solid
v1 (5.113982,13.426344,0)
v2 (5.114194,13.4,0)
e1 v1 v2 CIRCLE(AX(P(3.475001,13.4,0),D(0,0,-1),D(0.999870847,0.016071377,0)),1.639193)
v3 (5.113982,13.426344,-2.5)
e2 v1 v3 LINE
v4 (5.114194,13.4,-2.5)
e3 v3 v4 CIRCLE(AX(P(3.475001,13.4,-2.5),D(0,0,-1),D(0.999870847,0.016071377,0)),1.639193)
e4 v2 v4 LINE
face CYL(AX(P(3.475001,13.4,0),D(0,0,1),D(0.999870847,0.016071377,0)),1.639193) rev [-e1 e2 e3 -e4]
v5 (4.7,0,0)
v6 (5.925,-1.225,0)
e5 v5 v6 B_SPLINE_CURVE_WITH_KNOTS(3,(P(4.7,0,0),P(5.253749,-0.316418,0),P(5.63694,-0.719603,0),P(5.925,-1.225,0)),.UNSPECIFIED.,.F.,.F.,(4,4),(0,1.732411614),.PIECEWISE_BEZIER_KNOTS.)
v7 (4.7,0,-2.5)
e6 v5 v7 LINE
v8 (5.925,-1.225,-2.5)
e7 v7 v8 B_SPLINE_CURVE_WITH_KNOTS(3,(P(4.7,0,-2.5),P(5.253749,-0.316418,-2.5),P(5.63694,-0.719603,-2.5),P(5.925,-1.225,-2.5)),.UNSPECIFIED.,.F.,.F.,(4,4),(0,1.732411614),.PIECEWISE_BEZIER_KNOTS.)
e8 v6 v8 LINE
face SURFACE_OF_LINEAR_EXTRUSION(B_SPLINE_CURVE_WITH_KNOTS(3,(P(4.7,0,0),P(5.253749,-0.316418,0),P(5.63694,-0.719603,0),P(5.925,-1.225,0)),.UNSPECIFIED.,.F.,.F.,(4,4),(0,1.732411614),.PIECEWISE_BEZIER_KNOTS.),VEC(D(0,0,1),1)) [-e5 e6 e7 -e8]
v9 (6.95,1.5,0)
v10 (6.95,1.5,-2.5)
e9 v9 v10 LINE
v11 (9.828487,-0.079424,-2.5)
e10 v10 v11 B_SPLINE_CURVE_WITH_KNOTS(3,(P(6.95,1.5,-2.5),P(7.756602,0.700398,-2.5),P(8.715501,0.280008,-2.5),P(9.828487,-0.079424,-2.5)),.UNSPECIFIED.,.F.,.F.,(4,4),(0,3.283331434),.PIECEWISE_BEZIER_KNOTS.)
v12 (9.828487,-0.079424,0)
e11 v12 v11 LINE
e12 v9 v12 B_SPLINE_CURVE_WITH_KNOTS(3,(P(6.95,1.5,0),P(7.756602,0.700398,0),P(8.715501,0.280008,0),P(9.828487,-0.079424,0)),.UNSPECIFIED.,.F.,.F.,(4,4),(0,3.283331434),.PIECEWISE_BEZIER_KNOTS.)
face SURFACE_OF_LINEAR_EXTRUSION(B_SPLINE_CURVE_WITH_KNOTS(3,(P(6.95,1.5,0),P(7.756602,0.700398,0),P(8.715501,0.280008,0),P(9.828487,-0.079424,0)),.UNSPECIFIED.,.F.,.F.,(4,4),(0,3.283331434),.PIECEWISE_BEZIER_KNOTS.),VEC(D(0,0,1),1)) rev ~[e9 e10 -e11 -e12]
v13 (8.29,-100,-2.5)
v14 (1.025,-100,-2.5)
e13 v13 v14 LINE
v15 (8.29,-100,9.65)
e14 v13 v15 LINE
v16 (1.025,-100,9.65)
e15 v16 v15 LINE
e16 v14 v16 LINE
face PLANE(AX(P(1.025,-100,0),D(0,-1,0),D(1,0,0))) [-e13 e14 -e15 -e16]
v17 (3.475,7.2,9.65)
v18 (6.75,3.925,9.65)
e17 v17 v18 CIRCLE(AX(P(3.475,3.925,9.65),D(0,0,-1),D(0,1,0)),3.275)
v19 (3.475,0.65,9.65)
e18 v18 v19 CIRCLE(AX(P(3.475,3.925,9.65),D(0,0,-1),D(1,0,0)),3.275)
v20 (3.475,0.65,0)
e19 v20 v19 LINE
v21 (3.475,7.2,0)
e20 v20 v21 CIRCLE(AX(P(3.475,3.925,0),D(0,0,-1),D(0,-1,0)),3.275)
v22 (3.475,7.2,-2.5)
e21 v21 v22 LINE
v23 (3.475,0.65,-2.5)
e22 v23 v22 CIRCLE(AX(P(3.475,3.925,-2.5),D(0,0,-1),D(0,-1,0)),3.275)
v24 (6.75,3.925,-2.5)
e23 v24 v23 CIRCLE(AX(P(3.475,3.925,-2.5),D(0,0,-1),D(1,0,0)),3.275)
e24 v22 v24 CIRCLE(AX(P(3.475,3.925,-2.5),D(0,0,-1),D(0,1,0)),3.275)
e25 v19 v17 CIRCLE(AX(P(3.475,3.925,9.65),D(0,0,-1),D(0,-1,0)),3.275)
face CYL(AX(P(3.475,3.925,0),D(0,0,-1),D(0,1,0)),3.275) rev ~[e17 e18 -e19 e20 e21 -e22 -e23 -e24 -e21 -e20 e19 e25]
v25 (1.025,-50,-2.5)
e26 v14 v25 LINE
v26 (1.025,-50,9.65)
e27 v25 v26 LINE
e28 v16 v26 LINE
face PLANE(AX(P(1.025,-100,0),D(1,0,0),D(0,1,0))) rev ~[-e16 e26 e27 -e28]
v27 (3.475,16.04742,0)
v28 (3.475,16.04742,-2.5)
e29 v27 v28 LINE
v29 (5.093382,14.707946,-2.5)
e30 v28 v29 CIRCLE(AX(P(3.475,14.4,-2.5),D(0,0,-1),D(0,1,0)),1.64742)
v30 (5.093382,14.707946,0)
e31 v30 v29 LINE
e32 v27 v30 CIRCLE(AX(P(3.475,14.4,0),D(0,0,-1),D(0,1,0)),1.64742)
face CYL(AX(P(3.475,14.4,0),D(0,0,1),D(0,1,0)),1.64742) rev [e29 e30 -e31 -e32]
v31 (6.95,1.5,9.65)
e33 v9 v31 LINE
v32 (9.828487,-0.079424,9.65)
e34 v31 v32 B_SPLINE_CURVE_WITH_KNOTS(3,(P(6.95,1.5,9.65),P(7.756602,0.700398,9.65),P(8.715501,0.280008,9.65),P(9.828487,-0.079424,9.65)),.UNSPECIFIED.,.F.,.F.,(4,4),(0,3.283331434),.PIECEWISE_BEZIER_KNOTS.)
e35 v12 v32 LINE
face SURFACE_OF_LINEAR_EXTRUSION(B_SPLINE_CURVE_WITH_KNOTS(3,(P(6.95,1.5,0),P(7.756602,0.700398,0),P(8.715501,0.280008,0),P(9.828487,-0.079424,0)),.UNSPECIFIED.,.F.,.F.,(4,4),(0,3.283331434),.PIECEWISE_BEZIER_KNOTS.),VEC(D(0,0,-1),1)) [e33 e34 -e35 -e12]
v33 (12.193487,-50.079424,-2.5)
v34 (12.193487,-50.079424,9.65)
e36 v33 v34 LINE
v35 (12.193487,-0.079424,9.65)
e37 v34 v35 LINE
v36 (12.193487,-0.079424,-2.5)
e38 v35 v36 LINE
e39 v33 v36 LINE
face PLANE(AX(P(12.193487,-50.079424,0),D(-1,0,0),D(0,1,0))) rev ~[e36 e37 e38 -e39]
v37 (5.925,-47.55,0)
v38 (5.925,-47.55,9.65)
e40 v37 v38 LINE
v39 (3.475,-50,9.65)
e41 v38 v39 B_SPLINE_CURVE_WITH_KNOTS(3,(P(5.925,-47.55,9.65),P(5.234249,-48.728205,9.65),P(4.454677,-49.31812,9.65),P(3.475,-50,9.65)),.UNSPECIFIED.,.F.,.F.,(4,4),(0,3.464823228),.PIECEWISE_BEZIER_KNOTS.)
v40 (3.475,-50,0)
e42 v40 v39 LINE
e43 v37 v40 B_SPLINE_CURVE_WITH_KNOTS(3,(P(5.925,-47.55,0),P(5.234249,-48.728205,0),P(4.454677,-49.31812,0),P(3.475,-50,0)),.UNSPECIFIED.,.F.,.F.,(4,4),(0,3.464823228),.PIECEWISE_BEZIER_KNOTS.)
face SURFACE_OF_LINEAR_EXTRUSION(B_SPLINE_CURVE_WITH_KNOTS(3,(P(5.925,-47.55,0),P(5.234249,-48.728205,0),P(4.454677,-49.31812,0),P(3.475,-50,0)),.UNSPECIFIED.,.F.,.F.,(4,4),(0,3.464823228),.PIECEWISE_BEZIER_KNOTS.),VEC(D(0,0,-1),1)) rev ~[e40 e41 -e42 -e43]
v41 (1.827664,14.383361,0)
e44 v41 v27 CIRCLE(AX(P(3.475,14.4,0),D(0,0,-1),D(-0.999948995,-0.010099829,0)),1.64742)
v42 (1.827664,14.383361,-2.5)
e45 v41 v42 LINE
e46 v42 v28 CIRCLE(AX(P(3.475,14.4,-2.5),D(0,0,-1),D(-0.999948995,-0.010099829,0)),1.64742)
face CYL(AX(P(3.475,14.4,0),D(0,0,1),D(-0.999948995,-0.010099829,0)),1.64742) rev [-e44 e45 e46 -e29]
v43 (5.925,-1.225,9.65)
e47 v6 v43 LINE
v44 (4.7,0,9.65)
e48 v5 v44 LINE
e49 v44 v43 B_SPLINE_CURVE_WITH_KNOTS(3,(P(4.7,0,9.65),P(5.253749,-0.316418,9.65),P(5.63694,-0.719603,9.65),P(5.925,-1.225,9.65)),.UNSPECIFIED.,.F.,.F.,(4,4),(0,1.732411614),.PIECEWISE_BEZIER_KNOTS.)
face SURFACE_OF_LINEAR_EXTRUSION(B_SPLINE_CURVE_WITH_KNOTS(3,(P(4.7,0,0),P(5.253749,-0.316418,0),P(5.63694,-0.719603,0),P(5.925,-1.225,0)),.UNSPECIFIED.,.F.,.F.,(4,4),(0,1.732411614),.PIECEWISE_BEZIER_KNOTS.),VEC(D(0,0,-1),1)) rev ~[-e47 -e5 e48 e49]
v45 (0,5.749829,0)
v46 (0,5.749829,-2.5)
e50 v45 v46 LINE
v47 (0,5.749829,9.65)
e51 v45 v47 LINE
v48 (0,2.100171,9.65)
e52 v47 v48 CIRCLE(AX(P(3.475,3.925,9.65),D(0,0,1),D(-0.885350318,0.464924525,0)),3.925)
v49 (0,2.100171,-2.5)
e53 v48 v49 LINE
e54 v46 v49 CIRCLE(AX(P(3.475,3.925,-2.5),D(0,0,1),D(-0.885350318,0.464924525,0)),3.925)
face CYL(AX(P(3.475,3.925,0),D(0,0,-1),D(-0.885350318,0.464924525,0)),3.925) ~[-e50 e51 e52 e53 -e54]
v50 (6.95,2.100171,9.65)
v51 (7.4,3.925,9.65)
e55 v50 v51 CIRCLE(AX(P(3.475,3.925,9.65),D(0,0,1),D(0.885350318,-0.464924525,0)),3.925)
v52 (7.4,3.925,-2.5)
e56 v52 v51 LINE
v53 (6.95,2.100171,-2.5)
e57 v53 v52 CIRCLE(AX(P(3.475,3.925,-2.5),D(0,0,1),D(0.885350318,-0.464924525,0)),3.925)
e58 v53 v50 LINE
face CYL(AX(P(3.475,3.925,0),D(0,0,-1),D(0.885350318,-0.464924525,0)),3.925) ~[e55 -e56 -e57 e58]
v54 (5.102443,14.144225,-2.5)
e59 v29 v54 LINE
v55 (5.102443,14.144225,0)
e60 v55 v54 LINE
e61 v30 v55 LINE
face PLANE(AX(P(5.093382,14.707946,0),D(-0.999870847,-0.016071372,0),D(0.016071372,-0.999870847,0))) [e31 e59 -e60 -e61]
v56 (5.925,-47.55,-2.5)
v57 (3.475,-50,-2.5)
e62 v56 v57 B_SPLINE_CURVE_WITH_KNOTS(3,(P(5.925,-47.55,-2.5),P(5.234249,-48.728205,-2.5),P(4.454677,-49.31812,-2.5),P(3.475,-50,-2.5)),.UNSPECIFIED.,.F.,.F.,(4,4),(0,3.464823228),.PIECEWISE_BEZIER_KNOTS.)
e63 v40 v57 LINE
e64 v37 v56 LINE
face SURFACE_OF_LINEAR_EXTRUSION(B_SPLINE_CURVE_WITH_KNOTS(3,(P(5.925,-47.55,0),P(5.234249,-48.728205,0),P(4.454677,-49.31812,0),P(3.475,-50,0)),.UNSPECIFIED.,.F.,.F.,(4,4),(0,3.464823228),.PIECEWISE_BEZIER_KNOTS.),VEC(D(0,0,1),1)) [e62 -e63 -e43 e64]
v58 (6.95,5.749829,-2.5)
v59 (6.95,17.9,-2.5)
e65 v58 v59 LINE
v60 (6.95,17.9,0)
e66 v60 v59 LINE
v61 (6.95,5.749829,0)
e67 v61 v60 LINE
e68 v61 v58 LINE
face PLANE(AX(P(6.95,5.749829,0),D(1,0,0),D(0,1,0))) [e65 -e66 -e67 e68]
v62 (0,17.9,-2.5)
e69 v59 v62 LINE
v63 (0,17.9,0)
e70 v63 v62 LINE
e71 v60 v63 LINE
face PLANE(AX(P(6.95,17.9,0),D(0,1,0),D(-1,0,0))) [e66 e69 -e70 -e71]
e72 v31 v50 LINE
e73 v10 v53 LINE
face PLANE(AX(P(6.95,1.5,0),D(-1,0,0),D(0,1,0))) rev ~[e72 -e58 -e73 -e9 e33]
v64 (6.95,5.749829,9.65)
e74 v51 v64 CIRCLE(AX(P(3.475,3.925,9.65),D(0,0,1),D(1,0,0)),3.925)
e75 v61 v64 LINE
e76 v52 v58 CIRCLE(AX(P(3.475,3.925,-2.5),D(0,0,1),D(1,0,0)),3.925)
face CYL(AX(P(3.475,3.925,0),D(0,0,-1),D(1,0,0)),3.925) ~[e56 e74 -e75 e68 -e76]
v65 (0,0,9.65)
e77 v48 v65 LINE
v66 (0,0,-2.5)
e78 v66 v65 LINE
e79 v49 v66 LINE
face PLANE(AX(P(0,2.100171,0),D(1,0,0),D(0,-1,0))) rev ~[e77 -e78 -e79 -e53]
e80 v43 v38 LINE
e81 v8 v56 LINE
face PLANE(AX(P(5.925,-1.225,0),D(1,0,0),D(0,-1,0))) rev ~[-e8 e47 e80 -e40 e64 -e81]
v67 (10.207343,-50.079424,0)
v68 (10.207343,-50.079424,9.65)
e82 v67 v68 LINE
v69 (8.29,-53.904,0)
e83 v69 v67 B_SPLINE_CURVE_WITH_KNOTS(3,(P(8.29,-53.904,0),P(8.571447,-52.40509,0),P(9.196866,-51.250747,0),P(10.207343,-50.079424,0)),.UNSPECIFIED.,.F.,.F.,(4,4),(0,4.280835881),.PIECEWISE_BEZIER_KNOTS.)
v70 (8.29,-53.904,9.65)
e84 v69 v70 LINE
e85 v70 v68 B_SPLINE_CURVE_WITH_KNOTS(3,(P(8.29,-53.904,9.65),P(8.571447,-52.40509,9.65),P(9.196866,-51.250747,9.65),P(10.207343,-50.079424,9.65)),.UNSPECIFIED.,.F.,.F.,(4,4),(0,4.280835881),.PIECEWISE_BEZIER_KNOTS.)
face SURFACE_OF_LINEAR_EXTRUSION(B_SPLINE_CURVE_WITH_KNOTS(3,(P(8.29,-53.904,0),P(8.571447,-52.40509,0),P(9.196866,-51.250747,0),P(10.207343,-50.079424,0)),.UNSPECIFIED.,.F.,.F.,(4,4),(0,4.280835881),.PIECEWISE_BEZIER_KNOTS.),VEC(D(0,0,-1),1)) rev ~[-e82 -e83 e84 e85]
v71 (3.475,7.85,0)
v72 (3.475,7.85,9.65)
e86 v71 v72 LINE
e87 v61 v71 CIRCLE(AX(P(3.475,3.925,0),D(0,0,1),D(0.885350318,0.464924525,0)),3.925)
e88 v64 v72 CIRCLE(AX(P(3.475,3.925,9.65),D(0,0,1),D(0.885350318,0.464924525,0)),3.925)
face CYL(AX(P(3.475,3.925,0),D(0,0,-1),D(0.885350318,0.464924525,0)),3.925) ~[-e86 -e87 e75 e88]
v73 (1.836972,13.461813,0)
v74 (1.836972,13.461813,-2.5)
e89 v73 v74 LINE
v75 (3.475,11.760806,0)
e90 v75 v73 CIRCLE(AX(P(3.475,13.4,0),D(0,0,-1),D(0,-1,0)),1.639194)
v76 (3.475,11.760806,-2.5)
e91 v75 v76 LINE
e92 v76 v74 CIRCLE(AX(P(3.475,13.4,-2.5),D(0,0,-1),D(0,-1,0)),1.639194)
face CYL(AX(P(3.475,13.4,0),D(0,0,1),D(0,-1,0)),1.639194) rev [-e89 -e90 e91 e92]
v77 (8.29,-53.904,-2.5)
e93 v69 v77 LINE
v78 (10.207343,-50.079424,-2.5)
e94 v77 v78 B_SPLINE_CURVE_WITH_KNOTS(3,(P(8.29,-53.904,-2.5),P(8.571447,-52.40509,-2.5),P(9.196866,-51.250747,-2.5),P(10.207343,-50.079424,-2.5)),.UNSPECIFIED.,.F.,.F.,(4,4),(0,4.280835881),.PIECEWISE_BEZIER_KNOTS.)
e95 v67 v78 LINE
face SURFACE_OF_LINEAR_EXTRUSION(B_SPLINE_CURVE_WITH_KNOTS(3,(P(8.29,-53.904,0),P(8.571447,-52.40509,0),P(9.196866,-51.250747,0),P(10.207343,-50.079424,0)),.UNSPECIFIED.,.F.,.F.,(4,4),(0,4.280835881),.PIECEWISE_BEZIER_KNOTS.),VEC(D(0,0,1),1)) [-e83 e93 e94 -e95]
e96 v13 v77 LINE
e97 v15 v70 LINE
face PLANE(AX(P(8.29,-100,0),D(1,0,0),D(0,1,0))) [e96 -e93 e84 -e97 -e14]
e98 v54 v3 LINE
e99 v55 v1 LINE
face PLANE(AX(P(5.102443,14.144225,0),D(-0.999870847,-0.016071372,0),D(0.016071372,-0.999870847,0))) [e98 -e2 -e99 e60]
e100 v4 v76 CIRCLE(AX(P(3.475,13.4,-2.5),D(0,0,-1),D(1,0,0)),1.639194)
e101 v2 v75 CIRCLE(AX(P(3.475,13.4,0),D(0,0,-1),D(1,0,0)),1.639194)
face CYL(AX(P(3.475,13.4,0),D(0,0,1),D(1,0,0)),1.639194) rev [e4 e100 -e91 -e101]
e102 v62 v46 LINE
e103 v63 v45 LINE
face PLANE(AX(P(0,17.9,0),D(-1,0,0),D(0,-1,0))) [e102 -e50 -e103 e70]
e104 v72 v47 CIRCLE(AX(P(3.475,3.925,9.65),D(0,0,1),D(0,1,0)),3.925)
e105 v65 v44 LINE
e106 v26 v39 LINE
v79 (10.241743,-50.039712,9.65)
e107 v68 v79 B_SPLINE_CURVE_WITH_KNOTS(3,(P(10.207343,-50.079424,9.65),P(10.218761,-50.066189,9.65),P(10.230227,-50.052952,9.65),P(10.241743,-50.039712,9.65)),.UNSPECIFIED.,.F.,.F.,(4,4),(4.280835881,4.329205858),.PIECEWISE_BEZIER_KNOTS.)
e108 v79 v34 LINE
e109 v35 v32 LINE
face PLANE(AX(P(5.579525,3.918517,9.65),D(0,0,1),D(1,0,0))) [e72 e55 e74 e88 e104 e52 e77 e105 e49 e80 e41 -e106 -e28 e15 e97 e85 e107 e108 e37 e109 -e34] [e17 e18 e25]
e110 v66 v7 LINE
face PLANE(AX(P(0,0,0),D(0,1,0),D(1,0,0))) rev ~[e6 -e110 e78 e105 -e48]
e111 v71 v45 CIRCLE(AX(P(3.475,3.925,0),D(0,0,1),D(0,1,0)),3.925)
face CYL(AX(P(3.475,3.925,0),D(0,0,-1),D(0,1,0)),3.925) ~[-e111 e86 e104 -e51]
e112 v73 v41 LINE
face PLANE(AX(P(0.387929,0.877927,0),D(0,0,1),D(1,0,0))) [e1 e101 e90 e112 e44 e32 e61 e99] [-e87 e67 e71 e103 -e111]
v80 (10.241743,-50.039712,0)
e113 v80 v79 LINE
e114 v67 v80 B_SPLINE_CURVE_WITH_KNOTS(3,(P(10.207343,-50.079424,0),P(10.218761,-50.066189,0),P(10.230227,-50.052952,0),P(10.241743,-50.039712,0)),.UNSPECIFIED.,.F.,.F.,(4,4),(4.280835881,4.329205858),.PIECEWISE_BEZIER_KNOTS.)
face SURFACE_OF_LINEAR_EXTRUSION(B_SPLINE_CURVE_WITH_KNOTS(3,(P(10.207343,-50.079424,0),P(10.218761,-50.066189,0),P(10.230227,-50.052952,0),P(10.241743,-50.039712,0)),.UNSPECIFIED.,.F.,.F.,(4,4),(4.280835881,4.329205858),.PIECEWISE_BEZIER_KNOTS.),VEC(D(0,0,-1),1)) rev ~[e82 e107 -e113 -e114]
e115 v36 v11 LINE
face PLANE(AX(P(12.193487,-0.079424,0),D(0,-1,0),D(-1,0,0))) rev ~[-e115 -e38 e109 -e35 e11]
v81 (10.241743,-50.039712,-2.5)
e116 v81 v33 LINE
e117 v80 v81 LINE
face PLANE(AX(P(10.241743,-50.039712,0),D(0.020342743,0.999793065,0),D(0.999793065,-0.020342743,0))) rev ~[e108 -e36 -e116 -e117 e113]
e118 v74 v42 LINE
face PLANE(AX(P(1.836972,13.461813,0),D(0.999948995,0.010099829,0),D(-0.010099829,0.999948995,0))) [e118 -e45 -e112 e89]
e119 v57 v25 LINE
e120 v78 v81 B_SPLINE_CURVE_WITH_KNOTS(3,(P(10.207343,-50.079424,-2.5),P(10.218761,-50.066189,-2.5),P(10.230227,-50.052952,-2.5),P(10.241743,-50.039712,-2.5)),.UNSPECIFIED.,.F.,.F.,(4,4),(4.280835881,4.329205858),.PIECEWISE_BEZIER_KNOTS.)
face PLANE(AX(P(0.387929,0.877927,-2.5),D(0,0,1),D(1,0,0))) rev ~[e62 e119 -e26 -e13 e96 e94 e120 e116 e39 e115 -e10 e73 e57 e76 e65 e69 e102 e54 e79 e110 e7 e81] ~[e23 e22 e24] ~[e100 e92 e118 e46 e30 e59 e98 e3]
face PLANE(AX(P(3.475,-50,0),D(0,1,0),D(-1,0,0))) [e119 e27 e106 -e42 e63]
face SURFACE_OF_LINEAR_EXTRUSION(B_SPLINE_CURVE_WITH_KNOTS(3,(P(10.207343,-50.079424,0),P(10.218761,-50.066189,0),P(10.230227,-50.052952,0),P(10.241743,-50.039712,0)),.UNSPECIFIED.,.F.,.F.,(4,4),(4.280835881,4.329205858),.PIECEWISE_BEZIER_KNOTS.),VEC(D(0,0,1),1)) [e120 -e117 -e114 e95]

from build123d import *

# Parameters (mm, degrees)
F0_W     = 2.45
F0_H     = 50
F1_DEPTH = 2.5
F2_DEPTH = 9.65
F3_DEPTH = 2.5
F4_DEPTH = 9.65
F5_DEPTH = 9.65
F6_DEPTH = 2.5


with BuildPart() as f1:
    # F0 (on Top) → F1 (new body)
    with BuildSketch(Plane.XY):
        with BuildLine():
            Line((0, 2.1001712409), (0, 0))
            Line((0, 0), (1.025, 0))
            Line((1.025, 0), (1.025, 0.8585484677))
            ThreePointArc((1.025, 0.8585484677), (0.4481513041, 1.426237912), (0, 2.1001712409))
        make_face()
        with BuildLine():
            Line((1.025, 0.8585484677), (1.025, 0))
            Line((1.025, 0), (3.475, 0))
            ThreePointArc((3.475, 0), (2.1769624937, 0.2208504846), (1.025, 0.8585484677))
        make_face()
        with BuildLine():
            ThreePointArc((0, 5.7498287591), (-0.45, 3.925), (0, 2.1001712409))
            Line((0, 2.1001712409), (0, 5.7498287591))
        make_face()
        with BuildLine():
            Line((0, 5.7498287591), (0, 2.1001712409))
            ThreePointArc((0, 2.1001712409), (0.4481513041, 1.426237912), (1.025, 0.8585484677))
            ThreePointArc((1.025, 0.8585484677), (2.1769624937, 0.2208504846), (3.475, 0))
            Line((3.475, 0), (3.475, 0.65))
            ThreePointArc((3.475, 0.65), (0.2, 3.925), (3.475, 7.2))
            Line((3.475, 7.2), (3.475, 7.85))
            ThreePointArc((3.475, 7.85), (1.4448310267, 7.2841723593), (0, 5.7498287591))
        make_face()
        with BuildLine():
            ThreePointArc((5.925, 0.8585484677), (4.7730375063, 0.2208504846), (3.475, 0))
            Line((3.475, 0), (4.7, 0))
            Line((4.7, 0), (5.925, 0))
            Line((5.925, 0), (5.925, 0.8585484677))
        make_face()
        with BuildLine():
            Line((3.475, 0.65), (3.475, 0))
            ThreePointArc((3.475, 0), (4.7730375063, 0.2208504846), (5.925, 0.8585484677))
            ThreePointArc((5.925, 0.8585484677), (6.5018486959, 1.426237912), (6.95, 2.1001712409))
            Line((6.95, 2.1001712409), (6.95, 5.7498287591))
            ThreePointArc((6.95, 5.7498287591), (5.5051689733, 7.2841723593), (3.475, 7.85))
            Line((3.475, 7.85), (3.475, 7.2))
            ThreePointArc((3.475, 7.2), (5.7907747084, 6.2407747084), (6.75, 3.925))
            ThreePointArc((6.75, 3.925), (5.7907747084, 1.6092252916), (3.475, 0.65))
        make_face()
        with BuildLine():
            Line((0, 7.85), (0, 5.7498287591))
            ThreePointArc((0, 5.7498287591), (1.4448310267, 7.2841723593), (3.475, 7.85))
            ThreePointArc((3.475, 7.85), (5.5051689733, 7.2841723593), (6.95, 5.7498287591))
            Line((6.95, 5.7498287591), (6.95, 17.9))
            Line((6.95, 17.9), (3.475, 17.9))
            Line((3.475, 17.9), (0, 17.9))
            Line((0, 17.9), (0, 7.85))
        make_face()
        with BuildLine():
            ThreePointArc((1.8276640256, 14.3833613398), (2.3042302705, 15.55900427), (3.475, 16.0474200003))
            ThreePointArc((3.475, 16.0474200003), (4.5253988967, 15.6691157612), (5.0933824344, 14.7079463483))
            Line((5.0933824344, 14.7079463483), (5.1024433757, 14.1442252627))
            Line((5.1024433757, 14.1442252627), (5.113982201, 13.4263440945))
            ThreePointArc((5.113982201, 13.4263440945), (5.1141409801, 13.4131724726), (5.1141939076, 13.4))
            ThreePointArc((5.1141939076, 13.4), (4.6340851277, 12.2409148723), (3.475, 11.7608060924))
            ThreePointArc((3.475, 11.7608060924), (2.2942628451, 12.2629791393), (1.8369719791, 13.4618131819))
            Line((1.8369719791, 13.4618131819), (1.8276640256, 14.3833613398))
        make_face(mode=Mode.SUBTRACT)
        with BuildLine():
            Line((5.925, 0), (4.7, 0))
            add(Edge.make_bspline(
                [(4.7, 0), (5.2537494339, -0.3164176305), (5.6369397789, -0.7196032093), (5.925, -1.225)],
                knots=[0, 0, 0, 0, 1.7324116139, 1.7324116139, 1.7324116139, 1.7324116139], degree=3))
            Line((5.925, -1.225), (5.925, -0.079424061))
            Line((5.925, -0.079424061), (5.925, 0))
        make_face()
        with BuildLine():
            ThreePointArc((6.95, 2.1001712409), (6.5018486959, 1.426237912), (5.925, 0.8585484677))
            Line((5.925, 0.8585484677), (5.925, 0))
            Line((5.925, 0), (6.95, 0))
            Line((6.95, 0), (6.95, 1.44))
            Line((6.95, 1.44), (6.95, 1.5))
            Line((6.95, 1.5), (6.95, 2.1001712409))
        make_face()
        Polygon((6.95, 0), (5.925, 0), (5.925, -0.079424061), (5.925, -1.225), (5.925, -21.3844068348), (5.925, -22.55), (5.925, -22.9875), (5.925, -25), (9.8284865708, -25), (9.8284865708, -0.079424061), align=None)
        with BuildLine():
            Line((6.95, 5.7498287591), (6.95, 2.1001712409))
            ThreePointArc((6.95, 2.1001712409), (7.2858398025, 2.9852526935), (7.4, 3.925))
            ThreePointArc((7.4, 3.925), (7.2858398025, 4.8647473065), (6.95, 5.7498287591))
        make_face()
        with BuildLine():
            Line((6.95, 1.44), (6.95, 0))
            Line((6.95, 0), (9.8284865708, -0.079424061))
            add(Edge.make_bspline(
                [(6.95, 1.5), (7.7566024847, 0.7003984647), (8.7155010551, 0.2800084476), (9.8284865708, -0.079424061)],
                knots=[0, 0, 0, 0, 3.2833314336, 3.2833314336, 3.2833314336, 3.2833314336], degree=3))
            Line((6.95, 1.5), (6.95, 1.44))
        make_face()
        Polygon((12.1934865708, -0.079424061), (9.8284865708, -0.079424061), (9.8284865708, -25), (9.8284865708, -50.0313035152), (10.2417432854, -50.0397120305), (12.1934865708, -50.079424061), align=None)
        Polygon((9.8284865708, -25), (5.925, -25), (5.925, -26.9515), (5.925, -28.903), (5.925, -47.55), (5.925, -50), (8.29, -50), (9.8284865708, -50.0313035152), align=None)
        with Locations((2.25, -75)):
            Rectangle(F0_W, F0_H)
        with BuildLine():
            Line((10.2417432854, -50.0397120305), (9.8284865708, -50.0313035152))
            Line((9.8284865708, -50.0313035152), (9.8284865708, -50.0397120305))
            Line((9.8284865708, -50.0397120305), (9.8284865708, -50.079424061))
            Line((9.8284865708, -50.079424061), (10.207343012, -50.079424061))
            add(Edge.make_bspline(
                [(10.207343012, -50.079424061), (10.2187605889, -50.0661890592), (10.230227327, -50.0529518896), (10.2417432854, -50.0397120305)],
                knots=[4.2808358806, 4.2808358806, 4.2808358806, 4.2808358806, 4.3292058583, 4.3292058583, 4.3292058583, 4.3292058583], degree=3))
        make_face()
        Polygon((9.8284865708, -50.0397120305), (9.8284865708, -50.0313035152), (8.29, -50), (8.29, -50.0240602729), align=None)
        Polygon((5.925, -50), (3.475, -50), (3.475, -100), (5.925, -100), (5.925, -52.0125), align=None)
        with BuildLine():
            add(Edge.make_bspline(
                [(5.925, -47.55), (5.2342489362, -48.7282052636), (4.4546769932, -49.3181198835), (3.475, -50)],
                knots=[0, 0, 0, 0, 3.4648232278, 3.4648232278, 3.4648232278, 3.4648232278], degree=3))
            Line((3.475, -50), (5.925, -50))
            Line((5.925, -50), (5.925, -47.55))
        make_face()
        with BuildLine():
            Line((9.8284865708, -50.079424061), (9.8284865708, -50.0397120305))
            Line((9.8284865708, -50.0397120305), (8.29, -50.0240602729))
            Line((8.29, -50.0240602729), (8.29, -53.904))
            add(Edge.make_bspline(
                [(8.29, -53.904), (8.5714472143, -52.4050904341), (9.1968655396, -51.250747129), (10.207343012, -50.079424061)],
                knots=[0, 0, 0, 0, 4.2808358806, 4.2808358806, 4.2808358806, 4.2808358806], degree=3))
            Line((10.207343012, -50.079424061), (9.8284865708, -50.079424061))
        make_face()
        Polygon((8.29, -50.0240602729), (8.29, -50), (5.925, -50), align=None)
        Polygon((8.29, -50.0240602729), (5.925, -50), (5.925, -52.0125), (5.925, -100), (8.29, -100), (8.29, -53.904), align=None)
    extrude(amount=-F1_DEPTH)

    # F0 (on Top) → F2 (join)
    with BuildSketch(Plane.XY):
        with BuildLine():
            Line((3.475, 0.65), (3.475, 0))
            ThreePointArc((3.475, 0), (4.7730375063, 0.2208504846), (5.925, 0.8585484677))
            ThreePointArc((5.925, 0.8585484677), (6.5018486959, 1.426237912), (6.95, 2.1001712409))
            Line((6.95, 2.1001712409), (6.95, 5.7498287591))
            ThreePointArc((6.95, 5.7498287591), (5.5051689733, 7.2841723593), (3.475, 7.85))
            Line((3.475, 7.85), (3.475, 7.2))
            ThreePointArc((3.475, 7.2), (5.7907747084, 6.2407747084), (6.75, 3.925))
            ThreePointArc((6.75, 3.925), (5.7907747084, 1.6092252916), (3.475, 0.65))
        make_face()
        with BuildLine():
            Line((0, 5.7498287591), (0, 2.1001712409))
            ThreePointArc((0, 2.1001712409), (0.4481513041, 1.426237912), (1.025, 0.8585484677))
            ThreePointArc((1.025, 0.8585484677), (2.1769624937, 0.2208504846), (3.475, 0))
            Line((3.475, 0), (3.475, 0.65))
            ThreePointArc((3.475, 0.65), (0.2, 3.925), (3.475, 7.2))
            Line((3.475, 7.2), (3.475, 7.85))
            ThreePointArc((3.475, 7.85), (1.4448310267, 7.2841723593), (0, 5.7498287591))
        make_face()
        with BuildLine():
            Line((6.95, 5.7498287591), (6.95, 2.1001712409))
            ThreePointArc((6.95, 2.1001712409), (7.2858398025, 2.9852526935), (7.4, 3.925))
            ThreePointArc((7.4, 3.925), (7.2858398025, 4.8647473065), (6.95, 5.7498287591))
        make_face()
        with BuildLine():
            ThreePointArc((0, 5.7498287591), (-0.45, 3.925), (0, 2.1001712409))
            Line((0, 2.1001712409), (0, 5.7498287591))
        make_face()
        with BuildLine():
            Line((6.95, 1.44), (6.95, 0))
            Line((6.95, 0), (9.8284865708, -0.079424061))
            add(Edge.make_bspline(
                [(6.95, 1.5), (7.7566024847, 0.7003984647), (8.7155010551, 0.2800084476), (9.8284865708, -0.079424061)],
                knots=[0, 0, 0, 0, 3.2833314336, 3.2833314336, 3.2833314336, 3.2833314336], degree=3))
            Line((6.95, 1.5), (6.95, 1.44))
        make_face()
        with BuildLine():
            ThreePointArc((6.95, 2.1001712409), (6.5018486959, 1.426237912), (5.925, 0.8585484677))
            Line((5.925, 0.8585484677), (5.925, 0))
            Line((5.925, 0), (6.95, 0))
            Line((6.95, 0), (6.95, 1.44))
            Line((6.95, 1.44), (6.95, 1.5))
            Line((6.95, 1.5), (6.95, 2.1001712409))
        make_face()
        with BuildLine():
            ThreePointArc((5.925, 0.8585484677), (4.7730375063, 0.2208504846), (3.475, 0))
            Line((3.475, 0), (4.7, 0))
            Line((4.7, 0), (5.925, 0))
            Line((5.925, 0), (5.925, 0.8585484677))
        make_face()
        with BuildLine():
            Line((1.025, 0.8585484677), (1.025, 0))
            Line((1.025, 0), (3.475, 0))
            ThreePointArc((3.475, 0), (2.1769624937, 0.2208504846), (1.025, 0.8585484677))
        make_face()
        with BuildLine():
            Line((0, 2.1001712409), (0, 0))
            Line((0, 0), (1.025, 0))
            Line((1.025, 0), (1.025, 0.8585484677))
            ThreePointArc((1.025, 0.8585484677), (0.4481513041, 1.426237912), (0, 2.1001712409))
        make_face()
        Polygon((6.95, 0), (5.925, 0), (5.925, -0.079424061), (5.925, -1.225), (5.925, -21.3844068348), (5.925, -22.55), (5.925, -22.9875), (5.925, -25), (9.8284865708, -25), (9.8284865708, -0.079424061), align=None)
        with BuildLine():
            Line((5.925, 0), (4.7, 0))
            add(Edge.make_bspline(
                [(4.7, 0), (5.2537494339, -0.3164176305), (5.6369397789, -0.7196032093), (5.925, -1.225)],
                knots=[0, 0, 0, 0, 1.7324116139, 1.7324116139, 1.7324116139, 1.7324116139], degree=3))
            Line((5.925, -1.225), (5.925, -0.079424061))
            Line((5.925, -0.079424061), (5.925, 0))
        make_face()
        Polygon((9.8284865708, -25), (5.925, -25), (5.925, -26.9515), (5.925, -28.903), (5.925, -47.55), (5.925, -50), (8.29, -50), (9.8284865708, -50.0313035152), align=None)
        with BuildLine():
            add(Edge.make_bspline(
                [(5.925, -47.55), (5.2342489362, -48.7282052636), (4.4546769932, -49.3181198835), (3.475, -50)],
                knots=[0, 0, 0, 0, 3.4648232278, 3.4648232278, 3.4648232278, 3.4648232278], degree=3))
            Line((3.475, -50), (5.925, -50))
            Line((5.925, -50), (5.925, -47.55))
        make_face()
        Polygon((8.29, -50.0240602729), (5.925, -50), (5.925, -52.0125), (5.925, -100), (8.29, -100), (8.29, -53.904), align=None)
        Polygon((5.925, -50), (3.475, -50), (3.475, -100), (5.925, -100), (5.925, -52.0125), align=None)
        with Locations((2.25, -75)):
            Rectangle(F0_W, F0_H)
    extrude(amount=F2_DEPTH)

    # F0 (on Top) → F3 (join)
    with BuildSketch(Plane.XY):
        Polygon((12.1934865708, -0.079424061), (9.8284865708, -0.079424061), (9.8284865708, -25), (9.8284865708, -50.0313035152), (10.2417432854, -50.0397120305), (12.1934865708, -50.079424061), align=None)
        Polygon((8.29, -50.0240602729), (5.925, -50), (5.925, -52.0125), (5.925, -100), (8.29, -100), (8.29, -53.904), align=None)
        with BuildLine():
            Line((9.8284865708, -50.079424061), (9.8284865708, -50.0397120305))
            Line((9.8284865708, -50.0397120305), (8.29, -50.0240602729))
            Line((8.29, -50.0240602729), (8.29, -53.904))
            add(Edge.make_bspline(
                [(8.29, -53.904), (8.5714472143, -52.4050904341), (9.1968655396, -51.250747129), (10.207343012, -50.079424061)],
                knots=[0, 0, 0, 0, 4.2808358806, 4.2808358806, 4.2808358806, 4.2808358806], degree=3))
            Line((10.207343012, -50.079424061), (9.8284865708, -50.079424061))
        make_face()
    extrude(amount=-F3_DEPTH)

    # F0 (on Top) → F4 (join)
    with BuildSketch(Plane.XY):
        with BuildLine():
            Line((0, 2.1001712409), (0, 0))
            Line((0, 0), (1.025, 0))
            Line((1.025, 0), (1.025, 0.8585484677))
            ThreePointArc((1.025, 0.8585484677), (0.4481513041, 1.426237912), (0, 2.1001712409))
        make_face()
        with BuildLine():
            Line((1.025, 0.8585484677), (1.025, 0))
            Line((1.025, 0), (3.475, 0))
            ThreePointArc((3.475, 0), (2.1769624937, 0.2208504846), (1.025, 0.8585484677))
        make_face()
        with BuildLine():
            ThreePointArc((0, 5.7498287591), (-0.45, 3.925), (0, 2.1001712409))
            Line((0, 2.1001712409), (0, 5.7498287591))
        make_face()
        with BuildLine():
            Line((0, 5.7498287591), (0, 2.1001712409))
            ThreePointArc((0, 2.1001712409), (0.4481513041, 1.426237912), (1.025, 0.8585484677))
            ThreePointArc((1.025, 0.8585484677), (2.1769624937, 0.2208504846), (3.475, 0))
            Line((3.475, 0), (3.475, 0.65))
            ThreePointArc((3.475, 0.65), (0.2, 3.925), (3.475, 7.2))
            Line((3.475, 7.2), (3.475, 7.85))
            ThreePointArc((3.475, 7.85), (1.4448310267, 7.2841723593), (0, 5.7498287591))
        make_face()
        with BuildLine():
            ThreePointArc((5.925, 0.8585484677), (4.7730375063, 0.2208504846), (3.475, 0))
            Line((3.475, 0), (4.7, 0))
            Line((4.7, 0), (5.925, 0))
            Line((5.925, 0), (5.925, 0.8585484677))
        make_face()
        with BuildLine():
            Line((3.475, 0.65), (3.475, 0))
            ThreePointArc((3.475, 0), (4.7730375063, 0.2208504846), (5.925, 0.8585484677))
            ThreePointArc((5.925, 0.8585484677), (6.5018486959, 1.426237912), (6.95, 2.1001712409))
            Line((6.95, 2.1001712409), (6.95, 5.7498287591))
            ThreePointArc((6.95, 5.7498287591), (5.5051689733, 7.2841723593), (3.475, 7.85))
            Line((3.475, 7.85), (3.475, 7.2))
            ThreePointArc((3.475, 7.2), (5.7907747084, 6.2407747084), (6.75, 3.925))
            ThreePointArc((6.75, 3.925), (5.7907747084, 1.6092252916), (3.475, 0.65))
        make_face()
        with BuildLine():
            Line((5.925, 0), (4.7, 0))
            add(Edge.make_bspline(
                [(4.7, 0), (5.2537494339, -0.3164176305), (5.6369397789, -0.7196032093), (5.925, -1.225)],
                knots=[0, 0, 0, 0, 1.7324116139, 1.7324116139, 1.7324116139, 1.7324116139], degree=3))
            Line((5.925, -1.225), (5.925, -0.079424061))
            Line((5.925, -0.079424061), (5.925, 0))
        make_face()
        with BuildLine():
            ThreePointArc((6.95, 2.1001712409), (6.5018486959, 1.426237912), (5.925, 0.8585484677))
            Line((5.925, 0.8585484677), (5.925, 0))
            Line((5.925, 0), (6.95, 0))
            Line((6.95, 0), (6.95, 1.44))
            Line((6.95, 1.44), (6.95, 1.5))
            Line((6.95, 1.5), (6.95, 2.1001712409))
        make_face()
        Polygon((6.95, 0), (5.925, 0), (5.925, -0.079424061), (5.925, -1.225), (5.925, -21.3844068348), (5.925, -22.55), (5.925, -22.9875), (5.925, -25), (9.8284865708, -25), (9.8284865708, -0.079424061), align=None)
        with BuildLine():
            Line((6.95, 5.7498287591), (6.95, 2.1001712409))
            ThreePointArc((6.95, 2.1001712409), (7.2858398025, 2.9852526935), (7.4, 3.925))
            ThreePointArc((7.4, 3.925), (7.2858398025, 4.8647473065), (6.95, 5.7498287591))
        make_face()
        with BuildLine():
            Line((6.95, 1.44), (6.95, 0))
            Line((6.95, 0), (9.8284865708, -0.079424061))
            add(Edge.make_bspline(
                [(6.95, 1.5), (7.7566024847, 0.7003984647), (8.7155010551, 0.2800084476), (9.8284865708, -0.079424061)],
                knots=[0, 0, 0, 0, 3.2833314336, 3.2833314336, 3.2833314336, 3.2833314336], degree=3))
            Line((6.95, 1.5), (6.95, 1.44))
        make_face()
        Polygon((12.1934865708, -0.079424061), (9.8284865708, -0.079424061), (9.8284865708, -25), (9.8284865708, -50.0313035152), (10.2417432854, -50.0397120305), (12.1934865708, -50.079424061), align=None)
        with BuildLine():
            Line((9.8284865708, -50.079424061), (9.8284865708, -50.0397120305))
            Line((9.8284865708, -50.0397120305), (8.29, -50.0240602729))
            Line((8.29, -50.0240602729), (8.29, -53.904))
            add(Edge.make_bspline(
                [(8.29, -53.904), (8.5714472143, -52.4050904341), (9.1968655396, -51.250747129), (10.207343012, -50.079424061)],
                knots=[0, 0, 0, 0, 4.2808358806, 4.2808358806, 4.2808358806, 4.2808358806], degree=3))
            Line((10.207343012, -50.079424061), (9.8284865708, -50.079424061))
        make_face()
        Polygon((8.29, -50.0240602729), (5.925, -50), (5.925, -52.0125), (5.925, -100), (8.29, -100), (8.29, -53.904), align=None)
    extrude(amount=F4_DEPTH)

    # F0 (on Top) → F5 (join)
    with BuildSketch(Plane.XY):
        with BuildLine():
            Line((0, 2.1001712409), (0, 0))
            Line((0, 0), (1.025, 0))
            Line((1.025, 0), (1.025, 0.8585484677))
            ThreePointArc((1.025, 0.8585484677), (0.4481513041, 1.426237912), (0, 2.1001712409))
        make_face()
        with BuildLine():
            Line((1.025, 0.8585484677), (1.025, 0))
            Line((1.025, 0), (3.475, 0))
            ThreePointArc((3.475, 0), (2.1769624937, 0.2208504846), (1.025, 0.8585484677))
        make_face()
        with BuildLine():
            ThreePointArc((0, 5.7498287591), (-0.45, 3.925), (0, 2.1001712409))
            Line((0, 2.1001712409), (0, 5.7498287591))
        make_face()
        with BuildLine():
            Line((0, 5.7498287591), (0, 2.1001712409))
            ThreePointArc((0, 2.1001712409), (0.4481513041, 1.426237912), (1.025, 0.8585484677))
            ThreePointArc((1.025, 0.8585484677), (2.1769624937, 0.2208504846), (3.475, 0))
            Line((3.475, 0), (3.475, 0.65))
            ThreePointArc((3.475, 0.65), (0.2, 3.925), (3.475, 7.2))
            Line((3.475, 7.2), (3.475, 7.85))
            ThreePointArc((3.475, 7.85), (1.4448310267, 7.2841723593), (0, 5.7498287591))
        make_face()
        with BuildLine():
            ThreePointArc((5.925, 0.8585484677), (4.7730375063, 0.2208504846), (3.475, 0))
            Line((3.475, 0), (4.7, 0))
            Line((4.7, 0), (5.925, 0))
            Line((5.925, 0), (5.925, 0.8585484677))
        make_face()
        with BuildLine():
            Line((3.475, 0.65), (3.475, 0))
            ThreePointArc((3.475, 0), (4.7730375063, 0.2208504846), (5.925, 0.8585484677))
            ThreePointArc((5.925, 0.8585484677), (6.5018486959, 1.426237912), (6.95, 2.1001712409))
            Line((6.95, 2.1001712409), (6.95, 5.7498287591))
            ThreePointArc((6.95, 5.7498287591), (5.5051689733, 7.2841723593), (3.475, 7.85))
            Line((3.475, 7.85), (3.475, 7.2))
            ThreePointArc((3.475, 7.2), (5.7907747084, 6.2407747084), (6.75, 3.925))
            ThreePointArc((6.75, 3.925), (5.7907747084, 1.6092252916), (3.475, 0.65))
        make_face()
        with BuildLine():
            Line((5.925, 0), (4.7, 0))
            add(Edge.make_bspline(
                [(4.7, 0), (5.2537494339, -0.3164176305), (5.6369397789, -0.7196032093), (5.925, -1.225)],
                knots=[0, 0, 0, 0, 1.7324116139, 1.7324116139, 1.7324116139, 1.7324116139], degree=3))
            Line((5.925, -1.225), (5.925, -0.079424061))
            Line((5.925, -0.079424061), (5.925, 0))
        make_face()
        with BuildLine():
            ThreePointArc((6.95, 2.1001712409), (6.5018486959, 1.426237912), (5.925, 0.8585484677))
            Line((5.925, 0.8585484677), (5.925, 0))
            Line((5.925, 0), (6.95, 0))
            Line((6.95, 0), (6.95, 1.44))
            Line((6.95, 1.44), (6.95, 1.5))
            Line((6.95, 1.5), (6.95, 2.1001712409))
        make_face()
        Polygon((6.95, 0), (5.925, 0), (5.925, -0.079424061), (5.925, -1.225), (5.925, -21.3844068348), (5.925, -22.55), (5.925, -22.9875), (5.925, -25), (9.8284865708, -25), (9.8284865708, -0.079424061), align=None)
        with BuildLine():
            Line((6.95, 5.7498287591), (6.95, 2.1001712409))
            ThreePointArc((6.95, 2.1001712409), (7.2858398025, 2.9852526935), (7.4, 3.925))
            ThreePointArc((7.4, 3.925), (7.2858398025, 4.8647473065), (6.95, 5.7498287591))
        make_face()
        with BuildLine():
            Line((6.95, 1.44), (6.95, 0))
            Line((6.95, 0), (9.8284865708, -0.079424061))
            add(Edge.make_bspline(
                [(6.95, 1.5), (7.7566024847, 0.7003984647), (8.7155010551, 0.2800084476), (9.8284865708, -0.079424061)],
                knots=[0, 0, 0, 0, 3.2833314336, 3.2833314336, 3.2833314336, 3.2833314336], degree=3))
            Line((6.95, 1.5), (6.95, 1.44))
        make_face()
        Polygon((12.1934865708, -0.079424061), (9.8284865708, -0.079424061), (9.8284865708, -25), (9.8284865708, -50.0313035152), (10.2417432854, -50.0397120305), (12.1934865708, -50.079424061), align=None)
        Polygon((9.8284865708, -25), (5.925, -25), (5.925, -26.9515), (5.925, -28.903), (5.925, -47.55), (5.925, -50), (8.29, -50), (9.8284865708, -50.0313035152), align=None)
        with Locations((2.25, -75)):
            Rectangle(F0_W, F0_H)
        with BuildLine():
            Line((10.2417432854, -50.0397120305), (9.8284865708, -50.0313035152))
            Line((9.8284865708, -50.0313035152), (9.8284865708, -50.0397120305))
            Line((9.8284865708, -50.0397120305), (9.8284865708, -50.079424061))
            Line((9.8284865708, -50.079424061), (10.207343012, -50.079424061))
            add(Edge.make_bspline(
                [(10.207343012, -50.079424061), (10.2187605889, -50.0661890592), (10.230227327, -50.0529518896), (10.2417432854, -50.0397120305)],
                knots=[4.2808358806, 4.2808358806, 4.2808358806, 4.2808358806, 4.3292058583, 4.3292058583, 4.3292058583, 4.3292058583], degree=3))
        make_face()
        Polygon((9.8284865708, -50.0397120305), (9.8284865708, -50.0313035152), (8.29, -50), (8.29, -50.0240602729), align=None)
        Polygon((5.925, -50), (3.475, -50), (3.475, -100), (5.925, -100), (5.925, -52.0125), align=None)
        with BuildLine():
            add(Edge.make_bspline(
                [(5.925, -47.55), (5.2342489362, -48.7282052636), (4.4546769932, -49.3181198835), (3.475, -50)],
                knots=[0, 0, 0, 0, 3.4648232278, 3.4648232278, 3.4648232278, 3.4648232278], degree=3))
            Line((3.475, -50), (5.925, -50))
            Line((5.925, -50), (5.925, -47.55))
        make_face()
        Polygon((8.29, -50.0240602729), (8.29, -50), (5.925, -50), align=None)
    extrude(amount=F5_DEPTH)

    # F0 (on Top) → F6 (join)
    with BuildSketch(Plane.XY):
        with BuildLine():
            Line((0, 2.1001712409), (0, 0))
            Line((0, 0), (1.025, 0))
            Line((1.025, 0), (1.025, 0.8585484677))
            ThreePointArc((1.025, 0.8585484677), (0.4481513041, 1.426237912), (0, 2.1001712409))
        make_face()
        with BuildLine():
            Line((1.025, 0.8585484677), (1.025, 0))
            Line((1.025, 0), (3.475, 0))
            ThreePointArc((3.475, 0), (2.1769624937, 0.2208504846), (1.025, 0.8585484677))
        make_face()
        with BuildLine():
            ThreePointArc((0, 5.7498287591), (-0.45, 3.925), (0, 2.1001712409))
            Line((0, 2.1001712409), (0, 5.7498287591))
        make_face()
        with BuildLine():
            Line((0, 5.7498287591), (0, 2.1001712409))
            ThreePointArc((0, 2.1001712409), (0.4481513041, 1.426237912), (1.025, 0.8585484677))
            ThreePointArc((1.025, 0.8585484677), (2.1769624937, 0.2208504846), (3.475, 0))
            Line((3.475, 0), (3.475, 0.65))
            ThreePointArc((3.475, 0.65), (0.2, 3.925), (3.475, 7.2))
            Line((3.475, 7.2), (3.475, 7.85))
            ThreePointArc((3.475, 7.85), (1.4448310267, 7.2841723593), (0, 5.7498287591))
        make_face()
        with BuildLine():
            ThreePointArc((5.925, 0.8585484677), (4.7730375063, 0.2208504846), (3.475, 0))
            Line((3.475, 0), (4.7, 0))
            Line((4.7, 0), (5.925, 0))
            Line((5.925, 0), (5.925, 0.8585484677))
        make_face()
        with BuildLine():
            Line((3.475, 0.65), (3.475, 0))
            ThreePointArc((3.475, 0), (4.7730375063, 0.2208504846), (5.925, 0.8585484677))
            ThreePointArc((5.925, 0.8585484677), (6.5018486959, 1.426237912), (6.95, 2.1001712409))
            Line((6.95, 2.1001712409), (6.95, 5.7498287591))
            ThreePointArc((6.95, 5.7498287591), (5.5051689733, 7.2841723593), (3.475, 7.85))
            Line((3.475, 7.85), (3.475, 7.2))
            ThreePointArc((3.475, 7.2), (5.7907747084, 6.2407747084), (6.75, 3.925))
            ThreePointArc((6.75, 3.925), (5.7907747084, 1.6092252916), (3.475, 0.65))
        make_face()
        with BuildLine():
            Line((0, 7.85), (0, 5.7498287591))
            ThreePointArc((0, 5.7498287591), (1.4448310267, 7.2841723593), (3.475, 7.85))
            ThreePointArc((3.475, 7.85), (5.5051689733, 7.2841723593), (6.95, 5.7498287591))
            Line((6.95, 5.7498287591), (6.95, 17.9))
            Line((6.95, 17.9), (3.475, 17.9))
            Line((3.475, 17.9), (0, 17.9))
            Line((0, 17.9), (0, 7.85))
        make_face()
        with BuildLine():
            ThreePointArc((1.8276640256, 14.3833613398), (2.3042302705, 15.55900427), (3.475, 16.0474200003))
            ThreePointArc((3.475, 16.0474200003), (4.5253988967, 15.6691157612), (5.0933824344, 14.7079463483))
            Line((5.0933824344, 14.7079463483), (5.1024433757, 14.1442252627))
            Line((5.1024433757, 14.1442252627), (5.113982201, 13.4263440945))
            ThreePointArc((5.113982201, 13.4263440945), (5.1141409801, 13.4131724726), (5.1141939076, 13.4))
            ThreePointArc((5.1141939076, 13.4), (4.6340851277, 12.2409148723), (3.475, 11.7608060924))
            ThreePointArc((3.475, 11.7608060924), (2.2942628451, 12.2629791393), (1.8369719791, 13.4618131819))
            Line((1.8369719791, 13.4618131819), (1.8276640256, 14.3833613398))
        make_face(mode=Mode.SUBTRACT)
        with BuildLine():
            Line((5.925, 0), (4.7, 0))
            add(Edge.make_bspline(
                [(4.7, 0), (5.2537494339, -0.3164176305), (5.6369397789, -0.7196032093), (5.925, -1.225)],
                knots=[0, 0, 0, 0, 1.7324116139, 1.7324116139, 1.7324116139, 1.7324116139], degree=3))
            Line((5.925, -1.225), (5.925, -0.079424061))
            Line((5.925, -0.079424061), (5.925, 0))
        make_face()
        with BuildLine():
            ThreePointArc((6.95, 2.1001712409), (6.5018486959, 1.426237912), (5.925, 0.8585484677))
            Line((5.925, 0.8585484677), (5.925, 0))
            Line((5.925, 0), (6.95, 0))
            Line((6.95, 0), (6.95, 1.44))
            Line((6.95, 1.44), (6.95, 1.5))
            Line((6.95, 1.5), (6.95, 2.1001712409))
        make_face()
        Polygon((6.95, 0), (5.925, 0), (5.925, -0.079424061), (5.925, -1.225), (5.925, -21.3844068348), (5.925, -22.55), (5.925, -22.9875), (5.925, -25), (9.8284865708, -25), (9.8284865708, -0.079424061), align=None)
        with BuildLine():
            Line((6.95, 5.7498287591), (6.95, 2.1001712409))
            ThreePointArc((6.95, 2.1001712409), (7.2858398025, 2.9852526935), (7.4, 3.925))
            ThreePointArc((7.4, 3.925), (7.2858398025, 4.8647473065), (6.95, 5.7498287591))
        make_face()
        with BuildLine():
            Line((6.95, 1.44), (6.95, 0))
            Line((6.95, 0), (9.8284865708, -0.079424061))
            add(Edge.make_bspline(
                [(6.95, 1.5), (7.7566024847, 0.7003984647), (8.7155010551, 0.2800084476), (9.8284865708, -0.079424061)],
                knots=[0, 0, 0, 0, 3.2833314336, 3.2833314336, 3.2833314336, 3.2833314336], degree=3))
            Line((6.95, 1.5), (6.95, 1.44))
        make_face()
        Polygon((12.1934865708, -0.079424061), (9.8284865708, -0.079424061), (9.8284865708, -25), (9.8284865708, -50.0313035152), (10.2417432854, -50.0397120305), (12.1934865708, -50.079424061), align=None)
        Polygon((9.8284865708, -25), (5.925, -25), (5.925, -26.9515), (5.925, -28.903), (5.925, -47.55), (5.925, -50), (8.29, -50), (9.8284865708, -50.0313035152), align=None)
        with Locations((2.25, -75)):
            Rectangle(F0_W, F0_H)
        with BuildLine():
            Line((10.2417432854, -50.0397120305), (9.8284865708, -50.0313035152))
            Line((9.8284865708, -50.0313035152), (9.8284865708, -50.0397120305))
            Line((9.8284865708, -50.0397120305), (9.8284865708, -50.079424061))
            Line((9.8284865708, -50.079424061), (10.207343012, -50.079424061))
            add(Edge.make_bspline(
                [(10.207343012, -50.079424061), (10.2187605889, -50.0661890592), (10.230227327, -50.0529518896), (10.2417432854, -50.0397120305)],
                knots=[4.2808358806, 4.2808358806, 4.2808358806, 4.2808358806, 4.3292058583, 4.3292058583, 4.3292058583, 4.3292058583], degree=3))
        make_face()
        Polygon((9.8284865708, -50.0397120305), (9.8284865708, -50.0313035152), (8.29, -50), (8.29, -50.0240602729), align=None)
        Polygon((5.925, -50), (3.475, -50), (3.475, -100), (5.925, -100), (5.925, -52.0125), align=None)
        with BuildLine():
            add(Edge.make_bspline(
                [(5.925, -47.55), (5.2342489362, -48.7282052636), (4.4546769932, -49.3181198835), (3.475, -50)],
                knots=[0, 0, 0, 0, 3.4648232278, 3.4648232278, 3.4648232278, 3.4648232278], degree=3))
            Line((3.475, -50), (5.925, -50))
            Line((5.925, -50), (5.925, -47.55))
        make_face()
        with BuildLine():
            Line((9.8284865708, -50.079424061), (9.8284865708, -50.0397120305))
            Line((9.8284865708, -50.0397120305), (8.29, -50.0240602729))
            Line((8.29, -50.0240602729), (8.29, -53.904))
            add(Edge.make_bspline(
                [(8.29, -53.904), (8.5714472143, -52.4050904341), (9.1968655396, -51.250747129), (10.207343012, -50.079424061)],
                knots=[0, 0, 0, 0, 4.2808358806, 4.2808358806, 4.2808358806, 4.2808358806], degree=3))
            Line((10.207343012, -50.079424061), (9.8284865708, -50.079424061))
        make_face()
        Polygon((8.29, -50.0240602729), (8.29, -50), (5.925, -50), align=None)
        Polygon((8.29, -50.0240602729), (5.925, -50), (5.925, -52.0125), (5.925, -100), (8.29, -100), (8.29, -53.904), align=None)
    extrude(amount=-F6_DEPTH)


solid = f1.part
